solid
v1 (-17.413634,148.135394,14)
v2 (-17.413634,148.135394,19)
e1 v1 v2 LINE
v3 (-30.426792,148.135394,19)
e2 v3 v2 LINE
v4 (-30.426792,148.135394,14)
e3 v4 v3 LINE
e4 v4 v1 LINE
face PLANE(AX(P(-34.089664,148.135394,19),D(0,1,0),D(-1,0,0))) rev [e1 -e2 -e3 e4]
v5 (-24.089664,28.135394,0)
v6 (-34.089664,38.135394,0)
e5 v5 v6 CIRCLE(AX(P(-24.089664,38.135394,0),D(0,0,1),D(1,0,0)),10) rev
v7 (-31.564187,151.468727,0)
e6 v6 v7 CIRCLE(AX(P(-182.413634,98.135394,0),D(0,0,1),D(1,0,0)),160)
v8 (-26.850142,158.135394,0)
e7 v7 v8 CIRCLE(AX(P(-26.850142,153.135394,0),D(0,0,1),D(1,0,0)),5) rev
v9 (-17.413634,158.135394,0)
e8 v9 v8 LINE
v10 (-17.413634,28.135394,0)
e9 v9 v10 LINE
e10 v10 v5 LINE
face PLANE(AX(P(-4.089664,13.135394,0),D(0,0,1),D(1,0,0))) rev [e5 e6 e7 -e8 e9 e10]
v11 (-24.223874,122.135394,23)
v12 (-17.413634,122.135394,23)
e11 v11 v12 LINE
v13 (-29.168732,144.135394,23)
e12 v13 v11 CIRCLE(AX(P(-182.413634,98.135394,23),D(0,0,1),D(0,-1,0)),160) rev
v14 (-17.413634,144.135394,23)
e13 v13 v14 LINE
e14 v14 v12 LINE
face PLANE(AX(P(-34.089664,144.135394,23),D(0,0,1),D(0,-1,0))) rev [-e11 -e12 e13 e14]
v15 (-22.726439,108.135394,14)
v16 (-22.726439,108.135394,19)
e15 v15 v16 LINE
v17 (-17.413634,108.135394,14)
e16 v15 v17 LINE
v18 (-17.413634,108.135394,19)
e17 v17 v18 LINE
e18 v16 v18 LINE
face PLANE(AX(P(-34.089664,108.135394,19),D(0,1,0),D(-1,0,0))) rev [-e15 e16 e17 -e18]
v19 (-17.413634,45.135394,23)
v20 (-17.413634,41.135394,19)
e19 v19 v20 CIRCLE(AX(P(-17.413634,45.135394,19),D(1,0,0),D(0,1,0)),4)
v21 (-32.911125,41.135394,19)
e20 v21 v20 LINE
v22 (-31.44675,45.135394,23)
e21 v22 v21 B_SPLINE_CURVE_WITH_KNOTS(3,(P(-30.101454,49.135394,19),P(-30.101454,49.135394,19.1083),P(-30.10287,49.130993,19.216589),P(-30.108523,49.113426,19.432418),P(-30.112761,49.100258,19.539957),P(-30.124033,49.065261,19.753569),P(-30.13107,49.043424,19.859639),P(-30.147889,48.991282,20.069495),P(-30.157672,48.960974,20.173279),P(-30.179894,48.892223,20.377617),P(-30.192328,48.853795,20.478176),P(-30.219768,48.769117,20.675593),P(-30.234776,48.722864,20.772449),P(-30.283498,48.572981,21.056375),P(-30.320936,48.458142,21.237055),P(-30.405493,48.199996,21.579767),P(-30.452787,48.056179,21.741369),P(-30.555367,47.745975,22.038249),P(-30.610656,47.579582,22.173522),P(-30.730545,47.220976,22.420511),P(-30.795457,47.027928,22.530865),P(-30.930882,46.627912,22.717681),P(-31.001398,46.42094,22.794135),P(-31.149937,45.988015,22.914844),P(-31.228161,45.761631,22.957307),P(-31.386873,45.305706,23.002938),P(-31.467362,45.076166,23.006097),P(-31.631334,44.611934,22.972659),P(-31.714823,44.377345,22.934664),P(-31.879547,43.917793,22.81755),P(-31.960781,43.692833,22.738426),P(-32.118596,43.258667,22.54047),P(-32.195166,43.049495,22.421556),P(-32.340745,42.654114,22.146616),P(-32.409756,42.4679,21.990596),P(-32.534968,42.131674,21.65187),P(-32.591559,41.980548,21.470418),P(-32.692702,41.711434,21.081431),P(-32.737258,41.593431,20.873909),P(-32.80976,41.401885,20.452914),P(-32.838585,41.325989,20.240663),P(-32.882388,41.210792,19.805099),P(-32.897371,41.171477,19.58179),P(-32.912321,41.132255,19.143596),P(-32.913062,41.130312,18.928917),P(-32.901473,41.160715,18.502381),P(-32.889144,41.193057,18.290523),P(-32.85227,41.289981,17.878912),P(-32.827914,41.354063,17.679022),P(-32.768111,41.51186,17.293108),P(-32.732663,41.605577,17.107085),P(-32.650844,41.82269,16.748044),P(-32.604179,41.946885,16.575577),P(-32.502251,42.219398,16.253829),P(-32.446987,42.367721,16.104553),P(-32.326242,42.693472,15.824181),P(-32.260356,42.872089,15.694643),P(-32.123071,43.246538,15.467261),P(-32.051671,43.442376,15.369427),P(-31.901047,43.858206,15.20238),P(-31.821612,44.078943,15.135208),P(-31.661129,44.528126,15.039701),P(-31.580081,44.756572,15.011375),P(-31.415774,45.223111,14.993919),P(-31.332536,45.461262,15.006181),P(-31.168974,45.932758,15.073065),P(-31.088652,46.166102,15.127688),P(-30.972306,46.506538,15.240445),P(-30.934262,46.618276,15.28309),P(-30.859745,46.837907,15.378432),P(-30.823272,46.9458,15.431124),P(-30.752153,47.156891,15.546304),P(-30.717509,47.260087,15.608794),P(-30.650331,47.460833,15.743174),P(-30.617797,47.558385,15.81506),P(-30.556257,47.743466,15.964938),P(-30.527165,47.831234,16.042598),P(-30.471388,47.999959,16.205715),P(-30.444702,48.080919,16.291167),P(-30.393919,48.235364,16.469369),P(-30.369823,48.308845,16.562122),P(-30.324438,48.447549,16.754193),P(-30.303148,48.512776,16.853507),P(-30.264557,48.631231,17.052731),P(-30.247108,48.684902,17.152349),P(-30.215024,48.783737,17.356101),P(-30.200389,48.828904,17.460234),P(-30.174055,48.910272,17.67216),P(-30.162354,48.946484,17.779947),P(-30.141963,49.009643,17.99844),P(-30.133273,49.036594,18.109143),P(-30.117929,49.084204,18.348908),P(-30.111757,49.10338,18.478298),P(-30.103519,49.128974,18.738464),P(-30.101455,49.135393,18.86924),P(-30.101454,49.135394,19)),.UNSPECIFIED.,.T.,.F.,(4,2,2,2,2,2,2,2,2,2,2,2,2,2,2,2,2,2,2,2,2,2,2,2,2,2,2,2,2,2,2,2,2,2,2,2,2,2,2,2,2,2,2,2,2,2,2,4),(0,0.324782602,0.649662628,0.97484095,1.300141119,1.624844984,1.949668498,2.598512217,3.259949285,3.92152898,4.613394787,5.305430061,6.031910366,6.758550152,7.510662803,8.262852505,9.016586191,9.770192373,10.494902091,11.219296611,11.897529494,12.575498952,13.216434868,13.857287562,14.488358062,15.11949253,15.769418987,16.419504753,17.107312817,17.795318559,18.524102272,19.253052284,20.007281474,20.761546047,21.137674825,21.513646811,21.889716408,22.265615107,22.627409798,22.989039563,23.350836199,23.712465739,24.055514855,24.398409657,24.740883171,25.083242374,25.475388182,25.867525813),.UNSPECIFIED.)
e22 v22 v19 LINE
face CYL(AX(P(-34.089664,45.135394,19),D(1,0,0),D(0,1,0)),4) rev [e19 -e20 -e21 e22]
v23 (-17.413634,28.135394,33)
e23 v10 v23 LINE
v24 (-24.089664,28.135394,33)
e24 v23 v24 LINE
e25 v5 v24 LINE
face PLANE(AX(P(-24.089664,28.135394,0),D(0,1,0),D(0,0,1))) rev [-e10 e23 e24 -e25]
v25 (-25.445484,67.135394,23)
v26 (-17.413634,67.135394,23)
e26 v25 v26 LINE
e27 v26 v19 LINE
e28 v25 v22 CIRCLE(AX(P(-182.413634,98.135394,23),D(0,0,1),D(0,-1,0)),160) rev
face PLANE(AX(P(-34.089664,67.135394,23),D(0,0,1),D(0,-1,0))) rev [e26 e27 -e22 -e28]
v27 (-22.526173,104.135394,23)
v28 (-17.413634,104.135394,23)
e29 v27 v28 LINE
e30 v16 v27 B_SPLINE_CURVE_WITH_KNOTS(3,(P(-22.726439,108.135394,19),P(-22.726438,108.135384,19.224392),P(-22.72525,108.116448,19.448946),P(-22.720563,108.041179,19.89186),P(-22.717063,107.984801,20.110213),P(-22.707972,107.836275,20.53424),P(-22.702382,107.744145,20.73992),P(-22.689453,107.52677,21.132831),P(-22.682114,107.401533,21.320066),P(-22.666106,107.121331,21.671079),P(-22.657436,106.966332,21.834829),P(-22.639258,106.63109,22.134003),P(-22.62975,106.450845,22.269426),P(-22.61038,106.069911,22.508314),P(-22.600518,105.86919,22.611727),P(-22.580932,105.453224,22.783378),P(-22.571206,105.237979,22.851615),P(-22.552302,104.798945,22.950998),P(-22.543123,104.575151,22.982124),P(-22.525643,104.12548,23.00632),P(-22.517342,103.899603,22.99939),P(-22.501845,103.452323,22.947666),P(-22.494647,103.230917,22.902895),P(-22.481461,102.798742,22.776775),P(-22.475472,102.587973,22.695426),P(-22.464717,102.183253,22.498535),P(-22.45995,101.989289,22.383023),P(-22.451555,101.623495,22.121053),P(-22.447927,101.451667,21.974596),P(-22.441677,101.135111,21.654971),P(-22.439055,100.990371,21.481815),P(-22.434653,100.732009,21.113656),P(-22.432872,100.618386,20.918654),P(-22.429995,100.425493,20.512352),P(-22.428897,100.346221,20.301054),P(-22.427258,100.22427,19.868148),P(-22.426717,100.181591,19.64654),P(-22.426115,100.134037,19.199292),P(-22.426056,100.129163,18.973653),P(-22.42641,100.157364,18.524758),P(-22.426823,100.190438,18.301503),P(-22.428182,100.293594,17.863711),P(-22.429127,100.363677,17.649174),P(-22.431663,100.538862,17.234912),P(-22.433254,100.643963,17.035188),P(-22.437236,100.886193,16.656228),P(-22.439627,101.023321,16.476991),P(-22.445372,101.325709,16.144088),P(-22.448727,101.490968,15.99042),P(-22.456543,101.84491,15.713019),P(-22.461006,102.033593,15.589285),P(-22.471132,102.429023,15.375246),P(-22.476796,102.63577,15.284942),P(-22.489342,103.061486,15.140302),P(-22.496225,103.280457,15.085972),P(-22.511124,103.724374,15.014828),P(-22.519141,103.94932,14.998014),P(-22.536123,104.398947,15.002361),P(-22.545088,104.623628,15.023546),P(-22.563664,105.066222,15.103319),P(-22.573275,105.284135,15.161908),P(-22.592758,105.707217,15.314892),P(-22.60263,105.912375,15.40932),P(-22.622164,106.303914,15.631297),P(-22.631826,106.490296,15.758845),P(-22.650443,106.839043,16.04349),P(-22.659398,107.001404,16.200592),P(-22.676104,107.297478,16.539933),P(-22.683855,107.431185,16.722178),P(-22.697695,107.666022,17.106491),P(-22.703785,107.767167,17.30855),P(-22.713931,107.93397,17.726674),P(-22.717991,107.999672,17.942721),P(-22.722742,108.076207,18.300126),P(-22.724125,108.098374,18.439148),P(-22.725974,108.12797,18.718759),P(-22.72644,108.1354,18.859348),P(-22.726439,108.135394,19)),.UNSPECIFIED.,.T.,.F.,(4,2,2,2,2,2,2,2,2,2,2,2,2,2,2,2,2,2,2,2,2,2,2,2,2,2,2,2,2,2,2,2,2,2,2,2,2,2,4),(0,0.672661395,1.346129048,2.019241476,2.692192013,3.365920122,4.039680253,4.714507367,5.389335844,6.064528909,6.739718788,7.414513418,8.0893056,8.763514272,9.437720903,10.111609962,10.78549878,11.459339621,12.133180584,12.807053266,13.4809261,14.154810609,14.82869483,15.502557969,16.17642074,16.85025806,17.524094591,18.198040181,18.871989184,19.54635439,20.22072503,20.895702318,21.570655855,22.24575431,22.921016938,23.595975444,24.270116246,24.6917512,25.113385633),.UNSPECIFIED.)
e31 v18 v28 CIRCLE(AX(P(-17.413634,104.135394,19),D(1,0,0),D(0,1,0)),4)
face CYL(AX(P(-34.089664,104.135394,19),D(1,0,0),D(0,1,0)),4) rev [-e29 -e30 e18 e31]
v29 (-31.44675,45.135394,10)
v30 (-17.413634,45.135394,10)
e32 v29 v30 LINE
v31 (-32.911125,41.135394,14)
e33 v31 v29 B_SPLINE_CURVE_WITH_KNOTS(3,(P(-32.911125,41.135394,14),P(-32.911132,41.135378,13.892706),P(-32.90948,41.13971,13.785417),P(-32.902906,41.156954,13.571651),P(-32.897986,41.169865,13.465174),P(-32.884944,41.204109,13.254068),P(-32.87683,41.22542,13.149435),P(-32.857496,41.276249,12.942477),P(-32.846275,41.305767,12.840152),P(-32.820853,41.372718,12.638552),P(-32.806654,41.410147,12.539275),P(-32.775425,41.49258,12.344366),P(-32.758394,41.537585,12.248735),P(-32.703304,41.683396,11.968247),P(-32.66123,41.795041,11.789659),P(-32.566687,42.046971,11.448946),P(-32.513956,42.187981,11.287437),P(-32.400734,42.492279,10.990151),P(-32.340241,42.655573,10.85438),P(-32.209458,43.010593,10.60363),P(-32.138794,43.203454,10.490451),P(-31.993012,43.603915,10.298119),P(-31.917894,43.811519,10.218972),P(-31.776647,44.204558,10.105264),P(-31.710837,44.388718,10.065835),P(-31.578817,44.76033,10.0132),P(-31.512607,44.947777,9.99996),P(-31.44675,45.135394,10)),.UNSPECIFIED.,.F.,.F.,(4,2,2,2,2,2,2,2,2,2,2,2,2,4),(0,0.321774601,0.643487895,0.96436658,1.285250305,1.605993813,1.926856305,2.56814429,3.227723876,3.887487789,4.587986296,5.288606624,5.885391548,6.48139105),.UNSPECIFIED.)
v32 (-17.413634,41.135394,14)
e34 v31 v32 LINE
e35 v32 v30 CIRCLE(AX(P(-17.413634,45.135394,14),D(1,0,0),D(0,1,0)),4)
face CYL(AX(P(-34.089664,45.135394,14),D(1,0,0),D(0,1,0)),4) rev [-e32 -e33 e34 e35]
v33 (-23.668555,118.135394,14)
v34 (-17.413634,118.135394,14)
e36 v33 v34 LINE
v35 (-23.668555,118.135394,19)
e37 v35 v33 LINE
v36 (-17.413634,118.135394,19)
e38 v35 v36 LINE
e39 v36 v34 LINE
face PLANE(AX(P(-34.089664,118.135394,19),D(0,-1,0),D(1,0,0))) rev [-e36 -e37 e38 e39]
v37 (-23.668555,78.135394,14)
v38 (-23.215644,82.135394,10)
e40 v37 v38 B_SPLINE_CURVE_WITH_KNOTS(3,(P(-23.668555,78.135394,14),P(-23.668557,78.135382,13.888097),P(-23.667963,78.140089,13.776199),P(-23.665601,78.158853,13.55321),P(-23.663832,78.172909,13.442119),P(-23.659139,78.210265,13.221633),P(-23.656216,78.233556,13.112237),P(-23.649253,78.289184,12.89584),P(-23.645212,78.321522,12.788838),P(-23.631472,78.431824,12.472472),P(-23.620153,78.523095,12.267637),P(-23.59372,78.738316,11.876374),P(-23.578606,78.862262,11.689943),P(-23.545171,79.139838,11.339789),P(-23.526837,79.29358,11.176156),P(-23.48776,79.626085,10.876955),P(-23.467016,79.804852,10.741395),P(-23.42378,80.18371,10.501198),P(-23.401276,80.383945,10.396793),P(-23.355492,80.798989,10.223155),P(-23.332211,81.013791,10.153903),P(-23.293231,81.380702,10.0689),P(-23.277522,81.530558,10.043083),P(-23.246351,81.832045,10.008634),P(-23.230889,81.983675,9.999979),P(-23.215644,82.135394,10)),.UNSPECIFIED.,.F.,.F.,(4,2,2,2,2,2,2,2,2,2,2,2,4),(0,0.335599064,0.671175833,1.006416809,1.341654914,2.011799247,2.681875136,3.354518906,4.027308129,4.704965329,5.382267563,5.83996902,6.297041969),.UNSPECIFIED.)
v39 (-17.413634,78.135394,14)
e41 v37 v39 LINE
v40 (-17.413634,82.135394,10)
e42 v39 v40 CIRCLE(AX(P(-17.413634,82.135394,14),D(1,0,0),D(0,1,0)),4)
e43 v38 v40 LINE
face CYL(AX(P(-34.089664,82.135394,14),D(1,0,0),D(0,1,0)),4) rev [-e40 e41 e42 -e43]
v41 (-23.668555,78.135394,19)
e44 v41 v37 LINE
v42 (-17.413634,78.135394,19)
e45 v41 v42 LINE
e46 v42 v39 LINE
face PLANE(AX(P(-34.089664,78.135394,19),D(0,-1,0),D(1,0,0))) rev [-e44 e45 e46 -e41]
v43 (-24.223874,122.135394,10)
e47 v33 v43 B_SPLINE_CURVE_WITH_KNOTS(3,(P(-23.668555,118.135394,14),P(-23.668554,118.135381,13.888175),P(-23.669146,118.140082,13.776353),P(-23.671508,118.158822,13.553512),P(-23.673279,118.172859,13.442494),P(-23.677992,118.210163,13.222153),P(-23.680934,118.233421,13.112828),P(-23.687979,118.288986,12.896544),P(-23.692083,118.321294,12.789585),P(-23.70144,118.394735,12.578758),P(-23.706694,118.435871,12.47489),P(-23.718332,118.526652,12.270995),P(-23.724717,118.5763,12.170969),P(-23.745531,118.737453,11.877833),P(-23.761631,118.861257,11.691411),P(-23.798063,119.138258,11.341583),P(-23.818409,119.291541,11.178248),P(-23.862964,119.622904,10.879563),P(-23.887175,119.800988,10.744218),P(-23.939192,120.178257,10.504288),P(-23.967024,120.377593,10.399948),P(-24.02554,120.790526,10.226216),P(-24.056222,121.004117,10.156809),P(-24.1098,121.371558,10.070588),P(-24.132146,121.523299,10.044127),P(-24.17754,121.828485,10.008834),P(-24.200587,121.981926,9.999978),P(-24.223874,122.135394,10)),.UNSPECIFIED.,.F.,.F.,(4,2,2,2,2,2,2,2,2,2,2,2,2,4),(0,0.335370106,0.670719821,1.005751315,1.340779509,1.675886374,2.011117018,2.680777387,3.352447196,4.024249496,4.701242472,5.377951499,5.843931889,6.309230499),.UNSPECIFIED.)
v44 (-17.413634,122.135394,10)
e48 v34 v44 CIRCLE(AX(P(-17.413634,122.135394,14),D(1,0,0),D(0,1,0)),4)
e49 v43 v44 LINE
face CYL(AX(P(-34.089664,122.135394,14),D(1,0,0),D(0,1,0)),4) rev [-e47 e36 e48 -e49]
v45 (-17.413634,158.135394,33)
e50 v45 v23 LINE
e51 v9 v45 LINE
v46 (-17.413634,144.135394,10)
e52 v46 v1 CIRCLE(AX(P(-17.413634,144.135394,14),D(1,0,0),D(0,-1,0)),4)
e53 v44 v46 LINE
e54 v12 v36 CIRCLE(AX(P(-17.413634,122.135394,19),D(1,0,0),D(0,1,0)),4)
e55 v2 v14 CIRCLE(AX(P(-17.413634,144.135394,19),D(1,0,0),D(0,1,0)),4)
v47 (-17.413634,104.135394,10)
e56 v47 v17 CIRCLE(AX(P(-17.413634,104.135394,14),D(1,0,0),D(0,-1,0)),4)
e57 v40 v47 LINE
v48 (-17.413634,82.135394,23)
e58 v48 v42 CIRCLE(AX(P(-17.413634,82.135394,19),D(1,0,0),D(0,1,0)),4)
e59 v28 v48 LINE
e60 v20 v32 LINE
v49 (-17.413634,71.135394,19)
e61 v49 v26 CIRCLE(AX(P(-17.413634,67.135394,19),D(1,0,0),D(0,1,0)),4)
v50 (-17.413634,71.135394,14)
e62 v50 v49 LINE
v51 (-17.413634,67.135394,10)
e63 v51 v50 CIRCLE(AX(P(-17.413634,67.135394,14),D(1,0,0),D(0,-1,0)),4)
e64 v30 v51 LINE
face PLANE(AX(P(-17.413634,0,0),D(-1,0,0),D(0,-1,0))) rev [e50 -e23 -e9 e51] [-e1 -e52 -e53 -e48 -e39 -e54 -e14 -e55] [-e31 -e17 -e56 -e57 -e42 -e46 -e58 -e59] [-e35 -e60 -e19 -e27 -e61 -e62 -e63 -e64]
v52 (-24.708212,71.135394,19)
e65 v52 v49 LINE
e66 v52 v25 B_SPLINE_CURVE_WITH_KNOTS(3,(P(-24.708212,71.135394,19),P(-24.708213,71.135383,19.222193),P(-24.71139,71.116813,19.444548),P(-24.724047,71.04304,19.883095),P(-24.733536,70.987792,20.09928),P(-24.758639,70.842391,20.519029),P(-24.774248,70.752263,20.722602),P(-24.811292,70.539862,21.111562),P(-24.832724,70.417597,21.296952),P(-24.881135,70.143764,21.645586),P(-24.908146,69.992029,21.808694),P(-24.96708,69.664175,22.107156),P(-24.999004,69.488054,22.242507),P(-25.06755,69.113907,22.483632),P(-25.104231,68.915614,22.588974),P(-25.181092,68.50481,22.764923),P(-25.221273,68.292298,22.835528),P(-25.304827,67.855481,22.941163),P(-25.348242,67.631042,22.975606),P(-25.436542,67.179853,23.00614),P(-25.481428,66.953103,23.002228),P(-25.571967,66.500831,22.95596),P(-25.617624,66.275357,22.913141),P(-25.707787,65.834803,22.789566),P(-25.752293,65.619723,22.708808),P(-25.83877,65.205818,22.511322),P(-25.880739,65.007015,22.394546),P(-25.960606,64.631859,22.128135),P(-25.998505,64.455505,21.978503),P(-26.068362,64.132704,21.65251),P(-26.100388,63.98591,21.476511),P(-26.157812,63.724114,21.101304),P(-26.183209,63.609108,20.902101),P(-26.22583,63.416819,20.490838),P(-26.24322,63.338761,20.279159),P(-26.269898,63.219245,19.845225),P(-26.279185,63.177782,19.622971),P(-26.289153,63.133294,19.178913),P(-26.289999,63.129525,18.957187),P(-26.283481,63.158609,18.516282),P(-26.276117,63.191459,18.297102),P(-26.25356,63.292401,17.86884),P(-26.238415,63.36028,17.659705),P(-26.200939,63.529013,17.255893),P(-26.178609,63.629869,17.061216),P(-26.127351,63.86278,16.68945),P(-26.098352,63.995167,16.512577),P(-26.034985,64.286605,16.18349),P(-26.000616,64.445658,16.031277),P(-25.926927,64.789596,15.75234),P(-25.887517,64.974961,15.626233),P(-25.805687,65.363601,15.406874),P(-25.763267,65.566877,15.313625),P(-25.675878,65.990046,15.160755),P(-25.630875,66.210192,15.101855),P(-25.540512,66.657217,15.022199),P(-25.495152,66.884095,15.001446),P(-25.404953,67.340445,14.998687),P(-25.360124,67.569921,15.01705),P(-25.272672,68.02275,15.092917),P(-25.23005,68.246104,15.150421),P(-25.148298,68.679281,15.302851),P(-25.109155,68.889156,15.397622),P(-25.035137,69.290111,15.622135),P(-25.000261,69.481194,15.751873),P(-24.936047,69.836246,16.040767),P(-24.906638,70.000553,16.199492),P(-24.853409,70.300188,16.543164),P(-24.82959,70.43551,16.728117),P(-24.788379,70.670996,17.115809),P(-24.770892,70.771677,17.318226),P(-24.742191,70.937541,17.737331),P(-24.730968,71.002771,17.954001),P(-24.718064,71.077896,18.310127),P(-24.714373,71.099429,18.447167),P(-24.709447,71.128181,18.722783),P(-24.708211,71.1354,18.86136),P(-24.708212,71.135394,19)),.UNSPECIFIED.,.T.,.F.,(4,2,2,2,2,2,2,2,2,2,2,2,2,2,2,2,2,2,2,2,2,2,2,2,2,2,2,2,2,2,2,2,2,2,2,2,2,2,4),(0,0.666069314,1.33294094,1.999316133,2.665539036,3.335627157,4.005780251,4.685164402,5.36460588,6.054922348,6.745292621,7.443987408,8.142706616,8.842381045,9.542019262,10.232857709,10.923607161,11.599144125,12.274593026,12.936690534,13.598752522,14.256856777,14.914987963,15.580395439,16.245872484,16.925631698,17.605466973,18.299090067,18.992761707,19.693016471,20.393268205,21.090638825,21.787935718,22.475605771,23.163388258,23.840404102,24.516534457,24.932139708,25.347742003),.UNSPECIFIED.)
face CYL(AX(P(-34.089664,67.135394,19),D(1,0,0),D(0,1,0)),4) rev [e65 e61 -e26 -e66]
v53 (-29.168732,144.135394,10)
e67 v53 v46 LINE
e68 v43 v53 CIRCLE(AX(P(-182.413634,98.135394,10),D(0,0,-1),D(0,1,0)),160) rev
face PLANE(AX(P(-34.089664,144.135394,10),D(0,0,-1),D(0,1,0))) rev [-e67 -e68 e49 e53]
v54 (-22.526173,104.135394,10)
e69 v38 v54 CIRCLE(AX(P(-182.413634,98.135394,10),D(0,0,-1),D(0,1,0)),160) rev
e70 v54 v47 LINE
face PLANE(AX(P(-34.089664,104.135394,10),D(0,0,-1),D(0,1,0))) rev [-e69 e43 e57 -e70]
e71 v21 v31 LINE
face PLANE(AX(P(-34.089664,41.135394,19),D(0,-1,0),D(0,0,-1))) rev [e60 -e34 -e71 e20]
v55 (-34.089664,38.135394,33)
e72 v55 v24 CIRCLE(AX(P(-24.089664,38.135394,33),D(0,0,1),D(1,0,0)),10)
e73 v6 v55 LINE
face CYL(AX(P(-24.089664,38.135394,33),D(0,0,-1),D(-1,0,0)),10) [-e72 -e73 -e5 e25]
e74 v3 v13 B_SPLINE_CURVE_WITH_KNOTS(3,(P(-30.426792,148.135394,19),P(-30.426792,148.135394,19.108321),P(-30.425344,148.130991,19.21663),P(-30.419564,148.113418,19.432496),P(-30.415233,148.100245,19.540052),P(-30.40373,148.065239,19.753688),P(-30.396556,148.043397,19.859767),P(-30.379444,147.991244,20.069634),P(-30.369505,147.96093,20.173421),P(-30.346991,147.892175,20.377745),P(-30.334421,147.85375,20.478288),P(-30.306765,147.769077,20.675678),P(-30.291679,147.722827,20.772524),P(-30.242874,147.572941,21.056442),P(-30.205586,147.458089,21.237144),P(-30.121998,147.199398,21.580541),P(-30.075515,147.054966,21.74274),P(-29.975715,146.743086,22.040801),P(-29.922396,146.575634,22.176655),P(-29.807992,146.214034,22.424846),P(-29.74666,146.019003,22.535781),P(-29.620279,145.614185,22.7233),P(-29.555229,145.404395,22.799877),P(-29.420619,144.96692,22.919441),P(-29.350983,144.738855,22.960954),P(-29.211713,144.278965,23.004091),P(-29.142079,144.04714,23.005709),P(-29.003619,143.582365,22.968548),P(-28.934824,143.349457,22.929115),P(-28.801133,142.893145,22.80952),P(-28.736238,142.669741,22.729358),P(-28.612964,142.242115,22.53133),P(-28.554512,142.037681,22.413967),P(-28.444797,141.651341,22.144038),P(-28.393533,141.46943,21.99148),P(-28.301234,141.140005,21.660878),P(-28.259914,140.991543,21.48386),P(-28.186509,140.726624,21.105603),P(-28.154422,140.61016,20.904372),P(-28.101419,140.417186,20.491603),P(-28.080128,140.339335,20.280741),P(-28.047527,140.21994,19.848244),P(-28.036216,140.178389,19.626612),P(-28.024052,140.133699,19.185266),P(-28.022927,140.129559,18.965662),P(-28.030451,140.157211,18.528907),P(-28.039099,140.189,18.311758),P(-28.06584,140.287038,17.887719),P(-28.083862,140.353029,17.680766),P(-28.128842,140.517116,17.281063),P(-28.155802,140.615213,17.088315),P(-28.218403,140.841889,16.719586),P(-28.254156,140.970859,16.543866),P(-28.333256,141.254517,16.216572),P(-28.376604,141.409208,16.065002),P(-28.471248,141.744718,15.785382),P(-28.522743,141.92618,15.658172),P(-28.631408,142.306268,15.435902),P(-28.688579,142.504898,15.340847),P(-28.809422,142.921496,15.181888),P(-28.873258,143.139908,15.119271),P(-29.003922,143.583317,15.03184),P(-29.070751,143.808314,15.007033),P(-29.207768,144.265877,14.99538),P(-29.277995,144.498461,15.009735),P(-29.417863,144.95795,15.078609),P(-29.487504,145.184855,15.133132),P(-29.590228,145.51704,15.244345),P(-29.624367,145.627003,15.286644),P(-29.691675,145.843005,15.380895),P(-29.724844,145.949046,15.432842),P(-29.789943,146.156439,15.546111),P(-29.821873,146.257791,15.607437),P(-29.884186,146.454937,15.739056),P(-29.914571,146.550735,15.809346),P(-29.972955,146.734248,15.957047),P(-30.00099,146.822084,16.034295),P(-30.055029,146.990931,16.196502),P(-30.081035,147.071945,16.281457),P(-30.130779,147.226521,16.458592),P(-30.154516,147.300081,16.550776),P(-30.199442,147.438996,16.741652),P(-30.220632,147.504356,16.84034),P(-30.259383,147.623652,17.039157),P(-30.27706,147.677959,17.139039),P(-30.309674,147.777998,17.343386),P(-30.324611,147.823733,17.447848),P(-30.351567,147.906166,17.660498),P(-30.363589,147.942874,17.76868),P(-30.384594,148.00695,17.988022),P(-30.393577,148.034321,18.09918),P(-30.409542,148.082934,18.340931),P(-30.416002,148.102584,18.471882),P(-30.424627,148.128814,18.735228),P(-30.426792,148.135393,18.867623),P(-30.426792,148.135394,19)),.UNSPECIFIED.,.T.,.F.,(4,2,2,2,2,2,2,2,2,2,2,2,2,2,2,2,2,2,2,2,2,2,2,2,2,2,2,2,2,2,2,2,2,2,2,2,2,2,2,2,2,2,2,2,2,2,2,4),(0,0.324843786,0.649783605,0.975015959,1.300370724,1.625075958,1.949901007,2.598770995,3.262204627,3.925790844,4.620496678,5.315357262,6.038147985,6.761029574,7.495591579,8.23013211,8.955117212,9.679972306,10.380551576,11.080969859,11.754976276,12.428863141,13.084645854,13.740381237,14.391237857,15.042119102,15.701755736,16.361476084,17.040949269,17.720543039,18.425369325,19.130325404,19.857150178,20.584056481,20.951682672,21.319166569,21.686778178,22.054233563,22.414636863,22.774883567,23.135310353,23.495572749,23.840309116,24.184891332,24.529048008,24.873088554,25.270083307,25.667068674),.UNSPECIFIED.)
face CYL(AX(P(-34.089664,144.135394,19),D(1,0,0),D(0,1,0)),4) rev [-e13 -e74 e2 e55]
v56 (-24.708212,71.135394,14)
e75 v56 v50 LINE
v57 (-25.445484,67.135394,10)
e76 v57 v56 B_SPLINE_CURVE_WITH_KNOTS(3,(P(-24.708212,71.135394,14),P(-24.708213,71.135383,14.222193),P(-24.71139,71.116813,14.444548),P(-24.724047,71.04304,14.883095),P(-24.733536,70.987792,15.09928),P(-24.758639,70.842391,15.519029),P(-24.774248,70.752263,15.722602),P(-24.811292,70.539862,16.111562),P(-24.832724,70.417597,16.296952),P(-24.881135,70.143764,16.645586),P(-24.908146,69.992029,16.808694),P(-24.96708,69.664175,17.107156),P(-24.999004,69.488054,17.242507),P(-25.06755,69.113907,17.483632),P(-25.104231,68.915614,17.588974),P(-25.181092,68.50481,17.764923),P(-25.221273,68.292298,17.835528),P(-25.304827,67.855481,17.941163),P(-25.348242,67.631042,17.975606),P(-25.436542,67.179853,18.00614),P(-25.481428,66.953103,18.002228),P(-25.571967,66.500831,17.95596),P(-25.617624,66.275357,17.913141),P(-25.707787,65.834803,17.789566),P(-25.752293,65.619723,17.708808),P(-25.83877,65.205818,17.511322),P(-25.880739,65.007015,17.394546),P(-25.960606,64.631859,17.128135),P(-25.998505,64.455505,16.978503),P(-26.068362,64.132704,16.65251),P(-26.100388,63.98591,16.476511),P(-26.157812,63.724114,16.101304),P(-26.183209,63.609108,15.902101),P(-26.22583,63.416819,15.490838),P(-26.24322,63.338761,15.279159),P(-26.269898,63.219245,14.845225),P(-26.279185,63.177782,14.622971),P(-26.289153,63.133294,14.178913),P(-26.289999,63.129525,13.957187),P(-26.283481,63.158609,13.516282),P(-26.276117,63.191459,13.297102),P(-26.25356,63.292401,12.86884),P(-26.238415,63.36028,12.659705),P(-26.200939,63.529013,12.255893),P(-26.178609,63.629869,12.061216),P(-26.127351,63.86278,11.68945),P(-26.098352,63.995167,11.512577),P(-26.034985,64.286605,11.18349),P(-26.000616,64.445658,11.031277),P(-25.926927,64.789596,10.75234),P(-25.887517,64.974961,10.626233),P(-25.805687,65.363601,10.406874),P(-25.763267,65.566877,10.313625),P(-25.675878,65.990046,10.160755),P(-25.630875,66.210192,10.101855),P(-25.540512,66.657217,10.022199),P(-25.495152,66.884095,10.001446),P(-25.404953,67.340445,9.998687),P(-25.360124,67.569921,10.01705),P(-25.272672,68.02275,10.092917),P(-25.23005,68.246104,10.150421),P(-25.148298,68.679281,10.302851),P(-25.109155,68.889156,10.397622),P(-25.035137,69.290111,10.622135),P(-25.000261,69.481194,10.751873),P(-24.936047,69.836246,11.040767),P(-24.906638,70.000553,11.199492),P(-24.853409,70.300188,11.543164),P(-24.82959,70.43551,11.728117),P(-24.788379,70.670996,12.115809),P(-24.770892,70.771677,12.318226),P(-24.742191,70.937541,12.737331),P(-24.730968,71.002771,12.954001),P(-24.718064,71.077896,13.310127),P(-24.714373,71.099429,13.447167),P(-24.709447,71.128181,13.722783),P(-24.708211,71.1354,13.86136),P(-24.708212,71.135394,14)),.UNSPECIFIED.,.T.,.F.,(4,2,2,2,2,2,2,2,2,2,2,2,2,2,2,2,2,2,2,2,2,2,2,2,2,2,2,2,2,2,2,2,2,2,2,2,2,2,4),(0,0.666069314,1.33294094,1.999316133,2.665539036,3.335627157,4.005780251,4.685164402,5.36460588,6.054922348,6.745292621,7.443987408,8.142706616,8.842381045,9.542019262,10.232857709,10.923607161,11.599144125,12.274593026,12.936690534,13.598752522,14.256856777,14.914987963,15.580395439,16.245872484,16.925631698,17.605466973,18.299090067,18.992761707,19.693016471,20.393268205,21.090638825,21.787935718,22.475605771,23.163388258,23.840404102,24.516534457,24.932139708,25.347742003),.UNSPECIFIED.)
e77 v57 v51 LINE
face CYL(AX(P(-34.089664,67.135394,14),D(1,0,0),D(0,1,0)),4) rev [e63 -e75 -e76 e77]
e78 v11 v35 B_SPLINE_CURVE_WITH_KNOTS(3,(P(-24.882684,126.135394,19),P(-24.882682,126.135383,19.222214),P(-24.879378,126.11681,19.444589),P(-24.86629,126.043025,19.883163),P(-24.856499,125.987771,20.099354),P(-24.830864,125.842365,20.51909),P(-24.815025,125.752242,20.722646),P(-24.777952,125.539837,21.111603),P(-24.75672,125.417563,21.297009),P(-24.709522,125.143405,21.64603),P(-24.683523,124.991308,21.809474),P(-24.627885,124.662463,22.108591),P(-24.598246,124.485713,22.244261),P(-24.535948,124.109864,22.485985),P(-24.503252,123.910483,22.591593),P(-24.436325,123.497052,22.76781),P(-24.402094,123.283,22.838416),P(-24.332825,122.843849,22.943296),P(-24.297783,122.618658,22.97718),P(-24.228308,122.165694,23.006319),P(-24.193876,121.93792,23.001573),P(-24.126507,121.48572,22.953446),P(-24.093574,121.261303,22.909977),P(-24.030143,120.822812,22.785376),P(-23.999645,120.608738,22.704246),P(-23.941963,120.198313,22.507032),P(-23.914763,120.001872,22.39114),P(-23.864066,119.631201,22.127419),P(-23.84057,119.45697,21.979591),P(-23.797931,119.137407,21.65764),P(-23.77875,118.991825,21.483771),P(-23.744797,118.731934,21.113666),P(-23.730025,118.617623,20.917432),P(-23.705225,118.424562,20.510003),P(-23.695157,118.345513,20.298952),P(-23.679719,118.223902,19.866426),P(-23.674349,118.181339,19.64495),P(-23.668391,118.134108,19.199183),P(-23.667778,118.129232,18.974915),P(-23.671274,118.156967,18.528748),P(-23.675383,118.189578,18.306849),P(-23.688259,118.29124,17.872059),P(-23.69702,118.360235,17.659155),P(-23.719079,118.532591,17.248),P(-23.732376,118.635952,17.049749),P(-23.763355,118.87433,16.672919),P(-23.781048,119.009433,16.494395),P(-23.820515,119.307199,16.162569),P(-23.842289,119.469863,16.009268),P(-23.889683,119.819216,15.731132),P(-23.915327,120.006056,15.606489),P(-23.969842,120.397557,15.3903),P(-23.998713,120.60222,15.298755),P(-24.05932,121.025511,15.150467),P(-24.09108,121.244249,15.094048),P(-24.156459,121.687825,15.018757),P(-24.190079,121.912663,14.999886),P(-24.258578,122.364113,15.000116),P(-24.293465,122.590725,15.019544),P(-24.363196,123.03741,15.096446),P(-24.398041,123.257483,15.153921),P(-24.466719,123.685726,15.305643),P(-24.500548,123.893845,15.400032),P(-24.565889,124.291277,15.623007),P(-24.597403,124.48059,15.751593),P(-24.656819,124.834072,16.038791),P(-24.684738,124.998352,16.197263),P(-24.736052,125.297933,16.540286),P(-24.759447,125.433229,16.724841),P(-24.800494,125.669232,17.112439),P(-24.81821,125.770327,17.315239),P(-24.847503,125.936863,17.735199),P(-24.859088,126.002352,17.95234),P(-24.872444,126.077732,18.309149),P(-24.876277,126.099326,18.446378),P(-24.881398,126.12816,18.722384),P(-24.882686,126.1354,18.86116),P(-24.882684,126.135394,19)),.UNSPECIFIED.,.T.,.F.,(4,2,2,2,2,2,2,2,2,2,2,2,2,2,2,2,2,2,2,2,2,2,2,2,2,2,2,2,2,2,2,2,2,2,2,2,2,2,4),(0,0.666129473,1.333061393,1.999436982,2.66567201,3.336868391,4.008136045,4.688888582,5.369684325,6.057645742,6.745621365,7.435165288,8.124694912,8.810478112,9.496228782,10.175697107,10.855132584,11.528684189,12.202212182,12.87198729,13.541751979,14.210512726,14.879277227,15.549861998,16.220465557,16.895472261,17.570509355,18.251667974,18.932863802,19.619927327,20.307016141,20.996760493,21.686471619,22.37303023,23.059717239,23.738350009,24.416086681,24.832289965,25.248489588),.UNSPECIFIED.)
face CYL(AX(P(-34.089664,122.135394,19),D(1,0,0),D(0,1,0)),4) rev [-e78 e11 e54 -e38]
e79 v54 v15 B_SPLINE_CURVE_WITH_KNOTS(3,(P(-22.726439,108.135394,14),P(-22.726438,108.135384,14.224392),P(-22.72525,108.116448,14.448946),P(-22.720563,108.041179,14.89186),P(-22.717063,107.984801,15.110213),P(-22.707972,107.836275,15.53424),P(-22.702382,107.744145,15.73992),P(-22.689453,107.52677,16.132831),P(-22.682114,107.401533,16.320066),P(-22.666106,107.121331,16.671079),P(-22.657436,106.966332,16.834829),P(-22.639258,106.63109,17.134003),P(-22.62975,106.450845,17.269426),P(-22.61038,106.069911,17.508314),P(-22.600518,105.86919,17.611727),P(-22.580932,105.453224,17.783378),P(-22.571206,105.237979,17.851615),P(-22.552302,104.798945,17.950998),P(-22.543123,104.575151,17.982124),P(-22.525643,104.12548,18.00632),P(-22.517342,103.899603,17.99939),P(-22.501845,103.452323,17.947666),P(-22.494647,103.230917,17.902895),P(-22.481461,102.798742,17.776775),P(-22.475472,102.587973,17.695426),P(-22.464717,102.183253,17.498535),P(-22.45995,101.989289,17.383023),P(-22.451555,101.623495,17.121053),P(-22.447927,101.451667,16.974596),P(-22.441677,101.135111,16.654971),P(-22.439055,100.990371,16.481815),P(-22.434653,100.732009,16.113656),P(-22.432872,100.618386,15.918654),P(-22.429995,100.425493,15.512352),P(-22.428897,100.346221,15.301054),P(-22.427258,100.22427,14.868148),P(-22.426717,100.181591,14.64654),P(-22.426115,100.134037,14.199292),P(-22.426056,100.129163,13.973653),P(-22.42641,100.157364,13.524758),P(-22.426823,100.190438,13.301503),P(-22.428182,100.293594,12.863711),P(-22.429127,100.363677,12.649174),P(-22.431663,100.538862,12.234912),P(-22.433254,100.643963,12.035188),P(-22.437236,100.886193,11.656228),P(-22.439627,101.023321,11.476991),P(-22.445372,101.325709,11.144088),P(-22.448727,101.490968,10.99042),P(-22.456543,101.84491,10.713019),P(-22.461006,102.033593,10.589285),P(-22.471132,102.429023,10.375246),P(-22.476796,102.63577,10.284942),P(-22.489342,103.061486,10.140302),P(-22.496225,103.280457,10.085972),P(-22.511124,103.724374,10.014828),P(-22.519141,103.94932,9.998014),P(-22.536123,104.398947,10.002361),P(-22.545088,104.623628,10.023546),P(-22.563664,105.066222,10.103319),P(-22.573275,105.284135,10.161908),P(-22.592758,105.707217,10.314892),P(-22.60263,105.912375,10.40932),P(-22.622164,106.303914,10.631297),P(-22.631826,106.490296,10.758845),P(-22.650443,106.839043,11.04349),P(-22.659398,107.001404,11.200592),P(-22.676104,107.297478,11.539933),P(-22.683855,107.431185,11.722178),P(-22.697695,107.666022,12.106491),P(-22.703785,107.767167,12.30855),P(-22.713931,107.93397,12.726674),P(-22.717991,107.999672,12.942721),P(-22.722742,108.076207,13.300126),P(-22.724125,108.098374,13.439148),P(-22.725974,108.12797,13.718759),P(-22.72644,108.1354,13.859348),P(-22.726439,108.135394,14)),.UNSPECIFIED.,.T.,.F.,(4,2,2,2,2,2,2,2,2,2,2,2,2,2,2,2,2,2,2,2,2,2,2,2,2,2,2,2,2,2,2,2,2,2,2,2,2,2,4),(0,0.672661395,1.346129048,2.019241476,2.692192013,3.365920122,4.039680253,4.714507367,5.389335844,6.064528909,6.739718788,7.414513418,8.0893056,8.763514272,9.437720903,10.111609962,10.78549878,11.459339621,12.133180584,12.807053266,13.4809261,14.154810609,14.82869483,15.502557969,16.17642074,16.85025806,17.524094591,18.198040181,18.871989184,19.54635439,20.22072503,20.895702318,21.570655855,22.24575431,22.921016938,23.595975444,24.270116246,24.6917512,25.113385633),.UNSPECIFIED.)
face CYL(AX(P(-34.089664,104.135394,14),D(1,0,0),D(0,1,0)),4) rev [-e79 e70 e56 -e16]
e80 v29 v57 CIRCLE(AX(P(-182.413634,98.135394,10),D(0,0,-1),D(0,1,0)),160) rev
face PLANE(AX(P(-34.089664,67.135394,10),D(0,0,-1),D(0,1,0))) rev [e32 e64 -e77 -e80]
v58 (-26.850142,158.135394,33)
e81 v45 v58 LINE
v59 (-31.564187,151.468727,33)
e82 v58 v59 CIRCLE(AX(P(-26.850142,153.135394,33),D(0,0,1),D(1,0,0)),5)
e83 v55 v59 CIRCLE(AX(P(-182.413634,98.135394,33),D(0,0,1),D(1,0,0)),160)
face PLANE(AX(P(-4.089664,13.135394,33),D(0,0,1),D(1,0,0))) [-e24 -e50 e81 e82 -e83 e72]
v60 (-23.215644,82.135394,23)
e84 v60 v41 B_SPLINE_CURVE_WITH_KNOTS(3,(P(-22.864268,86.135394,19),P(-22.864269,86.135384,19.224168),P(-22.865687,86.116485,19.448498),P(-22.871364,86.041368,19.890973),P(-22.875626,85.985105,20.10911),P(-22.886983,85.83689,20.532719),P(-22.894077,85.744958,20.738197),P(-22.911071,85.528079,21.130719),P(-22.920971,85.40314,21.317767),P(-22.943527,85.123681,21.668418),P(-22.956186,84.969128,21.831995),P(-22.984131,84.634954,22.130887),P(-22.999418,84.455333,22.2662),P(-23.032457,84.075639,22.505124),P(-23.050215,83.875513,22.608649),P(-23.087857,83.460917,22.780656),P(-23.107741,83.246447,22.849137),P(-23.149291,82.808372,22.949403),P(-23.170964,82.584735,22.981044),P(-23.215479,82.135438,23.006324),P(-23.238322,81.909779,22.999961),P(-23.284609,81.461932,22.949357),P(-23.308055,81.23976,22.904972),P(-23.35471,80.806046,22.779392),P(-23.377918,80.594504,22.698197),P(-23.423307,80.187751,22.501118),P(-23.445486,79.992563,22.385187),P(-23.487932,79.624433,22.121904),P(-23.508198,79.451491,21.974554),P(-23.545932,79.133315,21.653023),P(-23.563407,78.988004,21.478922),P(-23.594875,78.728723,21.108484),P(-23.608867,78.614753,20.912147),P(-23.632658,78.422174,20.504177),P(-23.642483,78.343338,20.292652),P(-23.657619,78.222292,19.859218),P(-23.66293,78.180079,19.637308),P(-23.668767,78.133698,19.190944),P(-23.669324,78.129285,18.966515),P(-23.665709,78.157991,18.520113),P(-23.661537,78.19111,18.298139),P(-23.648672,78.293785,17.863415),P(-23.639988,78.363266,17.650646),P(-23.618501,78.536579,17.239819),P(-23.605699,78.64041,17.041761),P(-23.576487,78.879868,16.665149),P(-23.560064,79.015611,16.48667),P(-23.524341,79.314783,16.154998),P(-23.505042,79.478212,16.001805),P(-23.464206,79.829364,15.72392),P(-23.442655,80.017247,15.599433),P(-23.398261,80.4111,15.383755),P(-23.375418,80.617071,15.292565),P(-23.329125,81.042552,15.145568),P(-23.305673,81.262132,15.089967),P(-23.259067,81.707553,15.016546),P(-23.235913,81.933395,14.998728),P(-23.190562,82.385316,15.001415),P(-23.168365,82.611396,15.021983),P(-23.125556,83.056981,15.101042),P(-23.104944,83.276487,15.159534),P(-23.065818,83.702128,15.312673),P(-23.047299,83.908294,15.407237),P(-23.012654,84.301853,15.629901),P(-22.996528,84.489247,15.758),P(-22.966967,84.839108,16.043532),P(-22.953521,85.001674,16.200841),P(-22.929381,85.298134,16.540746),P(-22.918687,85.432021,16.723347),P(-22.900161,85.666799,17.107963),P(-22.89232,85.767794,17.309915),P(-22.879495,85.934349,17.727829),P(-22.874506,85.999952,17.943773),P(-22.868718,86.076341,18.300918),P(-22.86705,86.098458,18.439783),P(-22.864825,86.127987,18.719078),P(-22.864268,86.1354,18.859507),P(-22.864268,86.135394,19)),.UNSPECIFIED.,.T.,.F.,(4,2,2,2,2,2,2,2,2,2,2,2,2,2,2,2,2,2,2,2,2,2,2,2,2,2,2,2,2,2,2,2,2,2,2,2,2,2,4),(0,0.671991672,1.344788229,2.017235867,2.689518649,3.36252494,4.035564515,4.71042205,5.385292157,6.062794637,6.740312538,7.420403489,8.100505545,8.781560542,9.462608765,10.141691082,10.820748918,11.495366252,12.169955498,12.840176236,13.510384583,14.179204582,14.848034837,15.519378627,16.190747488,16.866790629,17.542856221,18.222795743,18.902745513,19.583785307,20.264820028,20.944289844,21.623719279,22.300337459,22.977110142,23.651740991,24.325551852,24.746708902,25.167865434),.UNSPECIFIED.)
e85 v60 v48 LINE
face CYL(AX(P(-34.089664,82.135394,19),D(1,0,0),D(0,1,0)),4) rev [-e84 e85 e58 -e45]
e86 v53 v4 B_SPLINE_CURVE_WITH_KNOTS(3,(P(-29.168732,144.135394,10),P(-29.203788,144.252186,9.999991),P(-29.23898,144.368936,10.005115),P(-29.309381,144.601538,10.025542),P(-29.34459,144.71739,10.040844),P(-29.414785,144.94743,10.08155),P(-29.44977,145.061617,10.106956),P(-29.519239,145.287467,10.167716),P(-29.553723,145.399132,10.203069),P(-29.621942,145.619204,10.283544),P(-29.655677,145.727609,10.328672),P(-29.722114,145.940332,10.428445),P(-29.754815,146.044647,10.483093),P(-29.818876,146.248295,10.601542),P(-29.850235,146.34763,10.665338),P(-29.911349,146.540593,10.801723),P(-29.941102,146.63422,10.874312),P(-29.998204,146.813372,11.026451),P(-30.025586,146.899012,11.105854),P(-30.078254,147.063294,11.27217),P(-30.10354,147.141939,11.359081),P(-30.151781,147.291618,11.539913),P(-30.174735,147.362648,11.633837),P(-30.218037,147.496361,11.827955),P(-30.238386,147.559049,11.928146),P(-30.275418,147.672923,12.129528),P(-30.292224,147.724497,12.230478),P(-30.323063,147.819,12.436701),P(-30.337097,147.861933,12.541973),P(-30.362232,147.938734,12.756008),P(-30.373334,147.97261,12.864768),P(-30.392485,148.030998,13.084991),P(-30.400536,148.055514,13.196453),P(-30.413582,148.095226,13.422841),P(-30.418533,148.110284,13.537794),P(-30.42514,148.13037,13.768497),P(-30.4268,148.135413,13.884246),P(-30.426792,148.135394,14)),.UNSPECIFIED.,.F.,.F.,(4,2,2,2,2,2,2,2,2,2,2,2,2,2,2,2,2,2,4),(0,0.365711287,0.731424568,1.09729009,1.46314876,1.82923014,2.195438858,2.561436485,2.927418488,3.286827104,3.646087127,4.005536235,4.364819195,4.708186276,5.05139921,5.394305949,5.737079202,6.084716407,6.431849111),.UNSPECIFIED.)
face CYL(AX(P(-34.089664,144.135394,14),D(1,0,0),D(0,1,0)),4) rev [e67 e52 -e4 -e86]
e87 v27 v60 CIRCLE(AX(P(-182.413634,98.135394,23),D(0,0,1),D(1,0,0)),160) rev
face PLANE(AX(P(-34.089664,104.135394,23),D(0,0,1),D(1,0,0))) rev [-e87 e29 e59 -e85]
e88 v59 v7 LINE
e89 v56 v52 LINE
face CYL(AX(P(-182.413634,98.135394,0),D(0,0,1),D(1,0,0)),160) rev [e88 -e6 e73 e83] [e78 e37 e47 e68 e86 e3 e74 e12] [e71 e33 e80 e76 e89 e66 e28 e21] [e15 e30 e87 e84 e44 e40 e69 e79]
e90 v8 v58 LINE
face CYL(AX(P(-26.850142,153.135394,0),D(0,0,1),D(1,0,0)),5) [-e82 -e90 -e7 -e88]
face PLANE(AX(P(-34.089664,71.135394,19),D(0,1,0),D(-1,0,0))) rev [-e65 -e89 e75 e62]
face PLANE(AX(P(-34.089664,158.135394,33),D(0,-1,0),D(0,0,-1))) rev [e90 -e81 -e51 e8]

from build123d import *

# Parameters (mm, degrees)
RESSALTO_EXTRUS_O1_DEPTH = 33
FILETE1_START            = -1
FILETE1_DEPTH            = 35
FILETE1_2_DEPTH          = 33
CORTE_EXTRUS_O2_DEPTH    = 166.099690852
ESBO_O4_W                = 39.149175328
ESBO_O4_H                = 26.52668984
CORTE_EXTRUS_O3_DEPTH    = 166.099690852
ESBO_O5_W                = 74.27128815
ESBO_O5_H                = 142.377248688
CORTE_EXTRUS_O4_DEPTH    = 166.099690852
FILETE2_R                = 5
CORTE_EXTRUS_O5_DEPTH    = 163.400408603


with BuildPart() as part:
    # Esboço1 → Ressalto-extrusão1 (new body)
    with BuildSketch(Plane.XY):
        with BuildLine():
            Line((-14.089663978, 13.135393664), (-14.089663978, 28.135393664))
            Line((-14.089663978, 28.135393664), (-34.089663978, 28.135393664))
            Line((-34.089663978, 28.135393664), (-34.089663978, 158.135393664))
            Line((-34.089663978, 158.135393664), (25.910336022, 158.135393664))
            Line((25.910336022, 158.135393664), (25.910336022, 28.135393664))
            Line((25.910336022, 28.135393664), (5.910336022, 28.135393664))
            Line((5.910336022, 28.135393664), (5.910336022, 13.135393664))
            ThreePointArc((5.910336022, 13.135393664), (-4.089663978, 3.135393664), (-14.089663978, 13.135393664))
        make_face()
    extrude(amount=RESSALTO_EXTRUS_O1_DEPTH)

    # Filete1: read off the stored shape, not the designer's step
    # Filete1 outline → Filete1 (cut)
    with BuildSketch(Plane.XY.offset(FILETE1_START)):
        with BuildLine():
            Line((25.910336022, 28.135393664), (25.910336022, 38.135393664))
            ThreePointArc((25.910336022, 38.135393664), (22.981403834, 31.064325852), (15.910336022, 28.135393664))
            Line((15.910336022, 28.135393664), (25.910336022, 28.135393664))
        make_face()
        with BuildLine():
            Line((-34.089663978, 28.135393664), (-24.089663978, 28.135393664))
            ThreePointArc((-24.089663978, 28.135393664), (-31.160731789, 31.064325853), (-34.089663978, 38.135393664))
            Line((-34.089663978, 38.135393664), (-34.089663978, 28.135393664))
        make_face()
    extrude(amount=FILETE1_DEPTH, mode=Mode.SUBTRACT)

    # Filete1 2 outline → Filete1 2 (add)
    with BuildSketch(Plane.XY):
        with BuildLine():
            ThreePointArc((5.910336022, 18.135393664), (8.83926821, 25.206461475), (15.910336022, 28.135393664))
            Line((15.910336022, 28.135393664), (5.910336022, 28.135393664))
            Line((5.910336022, 28.135393664), (5.910336022, 18.135393664))
        make_face()
        with BuildLine():
            ThreePointArc((-24.089663978, 28.135393664), (-17.018596166, 25.206461476), (-14.089663978, 18.135393664))
            Line((-14.089663978, 18.135393664), (-14.089663978, 28.135393664))
            Line((-14.089663978, 28.135393664), (-24.089663978, 28.135393664))
        make_face()
    extrude(amount=FILETE1_2_DEPTH)

    # Esboço3 → Corte-extrusão2 (cut, through all)
    with BuildSketch(Plane.XY.offset(33)):
        with BuildLine():
            ThreePointArc((-34.089663978, 38.135393664), (-22.413633719, 98.135393664), (-34.089663978, 158.135393664))
            Line((-34.089663978, 158.135393664), (-34.089663978, 38.135393664))
        make_face()
        with BuildLine():
            ThreePointArc((25.910336022, 38.135393664), (14.234305764, 98.135393664), (25.910336022, 158.135393664))
            Line((25.910336022, 158.135393664), (25.910336022, 38.135393664))
        make_face()
    extrude(amount=-CORTE_EXTRUS_O2_DEPTH, mode=Mode.SUBTRACT)

    # Esboço4 → Corte-extrusão3 (cut, through all)
    with BuildSketch(Plane.XY.offset(33)):
        with Locations((-4.515076314, 14.872048744)):
            Rectangle(ESBO_O4_W, ESBO_O4_H)
    extrude(amount=-CORTE_EXTRUS_O3_DEPTH, mode=Mode.SUBTRACT)

    # Esboço5 → Corte-extrusão4 (cut, through all)
    with BuildSketch(Plane.XY.offset(33)):
        with Locations((19.722010356, 86.94676932)):
            Rectangle(ESBO_O5_W, ESBO_O5_H)
    extrude(amount=-CORTE_EXTRUS_O4_DEPTH, mode=Mode.SUBTRACT)

    # Filete2
    filete2_edges = [part.edges().sort_by_distance(p)[0] for p in [
        (-34.089663978, 158.135393664, 16.5),
    ]]
    fillet(filete2_edges, radius=FILETE2_R)

    # Esboço6 → Corte-extrusão5 (cut, through all)
    with BuildSketch(Plane(origin=(-17.413633719, 0, 0), x_dir=(0, 0, -1), z_dir=(1, 0, 0))):
        with BuildLine():
            Line((-19, 148.135393664), (-14, 148.135393664))
            ThreePointArc((-14, 148.135393664), (-11.171572875, 146.963820789), (-10, 144.135393664))
            Line((-10, 144.135393664), (-10, 122.135393664))
            ThreePointArc((-10, 122.135393664), (-11.171572875, 119.306966539), (-14, 118.135393664))
            Line((-14, 118.135393664), (-19, 118.135393664))
            ThreePointArc((-19, 118.135393664), (-21.828427125, 119.306966539), (-23, 122.135393664))
            Line((-23, 122.135393664), (-23, 144.135393664))
            ThreePointArc((-23, 144.135393664), (-21.828427125, 146.963820789), (-19, 148.135393664))
        make_face()
        with BuildLine():
            Line((-19, 108.135393664), (-14, 108.135393664))
            ThreePointArc((-14, 108.135393664), (-11.171572875, 106.963820789), (-10, 104.135393664))
            Line((-10, 104.135393664), (-10, 82.135393664))
            ThreePointArc((-10, 82.135393664), (-11.171572875, 79.306966539), (-14, 78.135393664))
            Line((-14, 78.135393664), (-19, 78.135393664))
            ThreePointArc((-19, 78.135393664), (-21.828427125, 79.306966539), (-23, 82.135393664))
            Line((-23, 82.135393664), (-23, 104.135393664))
            ThreePointArc((-23, 104.135393664), (-21.828427125, 106.963820789), (-19, 108.135393664))
        make_face()
        with BuildLine():
            Line((-19, 71.135393664), (-14, 71.135393664))
            ThreePointArc((-14, 71.135393664), (-11.171572875, 69.963820789), (-10, 67.135393664))
            Line((-10, 67.135393664), (-10, 45.135393664))
            ThreePointArc((-10, 45.135393664), (-11.171572875, 42.306966539), (-14, 41.135393664))
            Line((-14, 41.135393664), (-19, 41.135393664))
            ThreePointArc((-19, 41.135393664), (-21.828427125, 42.306966539), (-23, 45.135393664))
            Line((-23, 45.135393664), (-23, 67.135393664))
            ThreePointArc((-23, 67.135393664), (-21.828427125, 69.963820789), (-19, 71.135393664))
        make_face()
    extrude(amount=-CORTE_EXTRUS_O5_DEPTH, mode=Mode.SUBTRACT)


solid = part.part
